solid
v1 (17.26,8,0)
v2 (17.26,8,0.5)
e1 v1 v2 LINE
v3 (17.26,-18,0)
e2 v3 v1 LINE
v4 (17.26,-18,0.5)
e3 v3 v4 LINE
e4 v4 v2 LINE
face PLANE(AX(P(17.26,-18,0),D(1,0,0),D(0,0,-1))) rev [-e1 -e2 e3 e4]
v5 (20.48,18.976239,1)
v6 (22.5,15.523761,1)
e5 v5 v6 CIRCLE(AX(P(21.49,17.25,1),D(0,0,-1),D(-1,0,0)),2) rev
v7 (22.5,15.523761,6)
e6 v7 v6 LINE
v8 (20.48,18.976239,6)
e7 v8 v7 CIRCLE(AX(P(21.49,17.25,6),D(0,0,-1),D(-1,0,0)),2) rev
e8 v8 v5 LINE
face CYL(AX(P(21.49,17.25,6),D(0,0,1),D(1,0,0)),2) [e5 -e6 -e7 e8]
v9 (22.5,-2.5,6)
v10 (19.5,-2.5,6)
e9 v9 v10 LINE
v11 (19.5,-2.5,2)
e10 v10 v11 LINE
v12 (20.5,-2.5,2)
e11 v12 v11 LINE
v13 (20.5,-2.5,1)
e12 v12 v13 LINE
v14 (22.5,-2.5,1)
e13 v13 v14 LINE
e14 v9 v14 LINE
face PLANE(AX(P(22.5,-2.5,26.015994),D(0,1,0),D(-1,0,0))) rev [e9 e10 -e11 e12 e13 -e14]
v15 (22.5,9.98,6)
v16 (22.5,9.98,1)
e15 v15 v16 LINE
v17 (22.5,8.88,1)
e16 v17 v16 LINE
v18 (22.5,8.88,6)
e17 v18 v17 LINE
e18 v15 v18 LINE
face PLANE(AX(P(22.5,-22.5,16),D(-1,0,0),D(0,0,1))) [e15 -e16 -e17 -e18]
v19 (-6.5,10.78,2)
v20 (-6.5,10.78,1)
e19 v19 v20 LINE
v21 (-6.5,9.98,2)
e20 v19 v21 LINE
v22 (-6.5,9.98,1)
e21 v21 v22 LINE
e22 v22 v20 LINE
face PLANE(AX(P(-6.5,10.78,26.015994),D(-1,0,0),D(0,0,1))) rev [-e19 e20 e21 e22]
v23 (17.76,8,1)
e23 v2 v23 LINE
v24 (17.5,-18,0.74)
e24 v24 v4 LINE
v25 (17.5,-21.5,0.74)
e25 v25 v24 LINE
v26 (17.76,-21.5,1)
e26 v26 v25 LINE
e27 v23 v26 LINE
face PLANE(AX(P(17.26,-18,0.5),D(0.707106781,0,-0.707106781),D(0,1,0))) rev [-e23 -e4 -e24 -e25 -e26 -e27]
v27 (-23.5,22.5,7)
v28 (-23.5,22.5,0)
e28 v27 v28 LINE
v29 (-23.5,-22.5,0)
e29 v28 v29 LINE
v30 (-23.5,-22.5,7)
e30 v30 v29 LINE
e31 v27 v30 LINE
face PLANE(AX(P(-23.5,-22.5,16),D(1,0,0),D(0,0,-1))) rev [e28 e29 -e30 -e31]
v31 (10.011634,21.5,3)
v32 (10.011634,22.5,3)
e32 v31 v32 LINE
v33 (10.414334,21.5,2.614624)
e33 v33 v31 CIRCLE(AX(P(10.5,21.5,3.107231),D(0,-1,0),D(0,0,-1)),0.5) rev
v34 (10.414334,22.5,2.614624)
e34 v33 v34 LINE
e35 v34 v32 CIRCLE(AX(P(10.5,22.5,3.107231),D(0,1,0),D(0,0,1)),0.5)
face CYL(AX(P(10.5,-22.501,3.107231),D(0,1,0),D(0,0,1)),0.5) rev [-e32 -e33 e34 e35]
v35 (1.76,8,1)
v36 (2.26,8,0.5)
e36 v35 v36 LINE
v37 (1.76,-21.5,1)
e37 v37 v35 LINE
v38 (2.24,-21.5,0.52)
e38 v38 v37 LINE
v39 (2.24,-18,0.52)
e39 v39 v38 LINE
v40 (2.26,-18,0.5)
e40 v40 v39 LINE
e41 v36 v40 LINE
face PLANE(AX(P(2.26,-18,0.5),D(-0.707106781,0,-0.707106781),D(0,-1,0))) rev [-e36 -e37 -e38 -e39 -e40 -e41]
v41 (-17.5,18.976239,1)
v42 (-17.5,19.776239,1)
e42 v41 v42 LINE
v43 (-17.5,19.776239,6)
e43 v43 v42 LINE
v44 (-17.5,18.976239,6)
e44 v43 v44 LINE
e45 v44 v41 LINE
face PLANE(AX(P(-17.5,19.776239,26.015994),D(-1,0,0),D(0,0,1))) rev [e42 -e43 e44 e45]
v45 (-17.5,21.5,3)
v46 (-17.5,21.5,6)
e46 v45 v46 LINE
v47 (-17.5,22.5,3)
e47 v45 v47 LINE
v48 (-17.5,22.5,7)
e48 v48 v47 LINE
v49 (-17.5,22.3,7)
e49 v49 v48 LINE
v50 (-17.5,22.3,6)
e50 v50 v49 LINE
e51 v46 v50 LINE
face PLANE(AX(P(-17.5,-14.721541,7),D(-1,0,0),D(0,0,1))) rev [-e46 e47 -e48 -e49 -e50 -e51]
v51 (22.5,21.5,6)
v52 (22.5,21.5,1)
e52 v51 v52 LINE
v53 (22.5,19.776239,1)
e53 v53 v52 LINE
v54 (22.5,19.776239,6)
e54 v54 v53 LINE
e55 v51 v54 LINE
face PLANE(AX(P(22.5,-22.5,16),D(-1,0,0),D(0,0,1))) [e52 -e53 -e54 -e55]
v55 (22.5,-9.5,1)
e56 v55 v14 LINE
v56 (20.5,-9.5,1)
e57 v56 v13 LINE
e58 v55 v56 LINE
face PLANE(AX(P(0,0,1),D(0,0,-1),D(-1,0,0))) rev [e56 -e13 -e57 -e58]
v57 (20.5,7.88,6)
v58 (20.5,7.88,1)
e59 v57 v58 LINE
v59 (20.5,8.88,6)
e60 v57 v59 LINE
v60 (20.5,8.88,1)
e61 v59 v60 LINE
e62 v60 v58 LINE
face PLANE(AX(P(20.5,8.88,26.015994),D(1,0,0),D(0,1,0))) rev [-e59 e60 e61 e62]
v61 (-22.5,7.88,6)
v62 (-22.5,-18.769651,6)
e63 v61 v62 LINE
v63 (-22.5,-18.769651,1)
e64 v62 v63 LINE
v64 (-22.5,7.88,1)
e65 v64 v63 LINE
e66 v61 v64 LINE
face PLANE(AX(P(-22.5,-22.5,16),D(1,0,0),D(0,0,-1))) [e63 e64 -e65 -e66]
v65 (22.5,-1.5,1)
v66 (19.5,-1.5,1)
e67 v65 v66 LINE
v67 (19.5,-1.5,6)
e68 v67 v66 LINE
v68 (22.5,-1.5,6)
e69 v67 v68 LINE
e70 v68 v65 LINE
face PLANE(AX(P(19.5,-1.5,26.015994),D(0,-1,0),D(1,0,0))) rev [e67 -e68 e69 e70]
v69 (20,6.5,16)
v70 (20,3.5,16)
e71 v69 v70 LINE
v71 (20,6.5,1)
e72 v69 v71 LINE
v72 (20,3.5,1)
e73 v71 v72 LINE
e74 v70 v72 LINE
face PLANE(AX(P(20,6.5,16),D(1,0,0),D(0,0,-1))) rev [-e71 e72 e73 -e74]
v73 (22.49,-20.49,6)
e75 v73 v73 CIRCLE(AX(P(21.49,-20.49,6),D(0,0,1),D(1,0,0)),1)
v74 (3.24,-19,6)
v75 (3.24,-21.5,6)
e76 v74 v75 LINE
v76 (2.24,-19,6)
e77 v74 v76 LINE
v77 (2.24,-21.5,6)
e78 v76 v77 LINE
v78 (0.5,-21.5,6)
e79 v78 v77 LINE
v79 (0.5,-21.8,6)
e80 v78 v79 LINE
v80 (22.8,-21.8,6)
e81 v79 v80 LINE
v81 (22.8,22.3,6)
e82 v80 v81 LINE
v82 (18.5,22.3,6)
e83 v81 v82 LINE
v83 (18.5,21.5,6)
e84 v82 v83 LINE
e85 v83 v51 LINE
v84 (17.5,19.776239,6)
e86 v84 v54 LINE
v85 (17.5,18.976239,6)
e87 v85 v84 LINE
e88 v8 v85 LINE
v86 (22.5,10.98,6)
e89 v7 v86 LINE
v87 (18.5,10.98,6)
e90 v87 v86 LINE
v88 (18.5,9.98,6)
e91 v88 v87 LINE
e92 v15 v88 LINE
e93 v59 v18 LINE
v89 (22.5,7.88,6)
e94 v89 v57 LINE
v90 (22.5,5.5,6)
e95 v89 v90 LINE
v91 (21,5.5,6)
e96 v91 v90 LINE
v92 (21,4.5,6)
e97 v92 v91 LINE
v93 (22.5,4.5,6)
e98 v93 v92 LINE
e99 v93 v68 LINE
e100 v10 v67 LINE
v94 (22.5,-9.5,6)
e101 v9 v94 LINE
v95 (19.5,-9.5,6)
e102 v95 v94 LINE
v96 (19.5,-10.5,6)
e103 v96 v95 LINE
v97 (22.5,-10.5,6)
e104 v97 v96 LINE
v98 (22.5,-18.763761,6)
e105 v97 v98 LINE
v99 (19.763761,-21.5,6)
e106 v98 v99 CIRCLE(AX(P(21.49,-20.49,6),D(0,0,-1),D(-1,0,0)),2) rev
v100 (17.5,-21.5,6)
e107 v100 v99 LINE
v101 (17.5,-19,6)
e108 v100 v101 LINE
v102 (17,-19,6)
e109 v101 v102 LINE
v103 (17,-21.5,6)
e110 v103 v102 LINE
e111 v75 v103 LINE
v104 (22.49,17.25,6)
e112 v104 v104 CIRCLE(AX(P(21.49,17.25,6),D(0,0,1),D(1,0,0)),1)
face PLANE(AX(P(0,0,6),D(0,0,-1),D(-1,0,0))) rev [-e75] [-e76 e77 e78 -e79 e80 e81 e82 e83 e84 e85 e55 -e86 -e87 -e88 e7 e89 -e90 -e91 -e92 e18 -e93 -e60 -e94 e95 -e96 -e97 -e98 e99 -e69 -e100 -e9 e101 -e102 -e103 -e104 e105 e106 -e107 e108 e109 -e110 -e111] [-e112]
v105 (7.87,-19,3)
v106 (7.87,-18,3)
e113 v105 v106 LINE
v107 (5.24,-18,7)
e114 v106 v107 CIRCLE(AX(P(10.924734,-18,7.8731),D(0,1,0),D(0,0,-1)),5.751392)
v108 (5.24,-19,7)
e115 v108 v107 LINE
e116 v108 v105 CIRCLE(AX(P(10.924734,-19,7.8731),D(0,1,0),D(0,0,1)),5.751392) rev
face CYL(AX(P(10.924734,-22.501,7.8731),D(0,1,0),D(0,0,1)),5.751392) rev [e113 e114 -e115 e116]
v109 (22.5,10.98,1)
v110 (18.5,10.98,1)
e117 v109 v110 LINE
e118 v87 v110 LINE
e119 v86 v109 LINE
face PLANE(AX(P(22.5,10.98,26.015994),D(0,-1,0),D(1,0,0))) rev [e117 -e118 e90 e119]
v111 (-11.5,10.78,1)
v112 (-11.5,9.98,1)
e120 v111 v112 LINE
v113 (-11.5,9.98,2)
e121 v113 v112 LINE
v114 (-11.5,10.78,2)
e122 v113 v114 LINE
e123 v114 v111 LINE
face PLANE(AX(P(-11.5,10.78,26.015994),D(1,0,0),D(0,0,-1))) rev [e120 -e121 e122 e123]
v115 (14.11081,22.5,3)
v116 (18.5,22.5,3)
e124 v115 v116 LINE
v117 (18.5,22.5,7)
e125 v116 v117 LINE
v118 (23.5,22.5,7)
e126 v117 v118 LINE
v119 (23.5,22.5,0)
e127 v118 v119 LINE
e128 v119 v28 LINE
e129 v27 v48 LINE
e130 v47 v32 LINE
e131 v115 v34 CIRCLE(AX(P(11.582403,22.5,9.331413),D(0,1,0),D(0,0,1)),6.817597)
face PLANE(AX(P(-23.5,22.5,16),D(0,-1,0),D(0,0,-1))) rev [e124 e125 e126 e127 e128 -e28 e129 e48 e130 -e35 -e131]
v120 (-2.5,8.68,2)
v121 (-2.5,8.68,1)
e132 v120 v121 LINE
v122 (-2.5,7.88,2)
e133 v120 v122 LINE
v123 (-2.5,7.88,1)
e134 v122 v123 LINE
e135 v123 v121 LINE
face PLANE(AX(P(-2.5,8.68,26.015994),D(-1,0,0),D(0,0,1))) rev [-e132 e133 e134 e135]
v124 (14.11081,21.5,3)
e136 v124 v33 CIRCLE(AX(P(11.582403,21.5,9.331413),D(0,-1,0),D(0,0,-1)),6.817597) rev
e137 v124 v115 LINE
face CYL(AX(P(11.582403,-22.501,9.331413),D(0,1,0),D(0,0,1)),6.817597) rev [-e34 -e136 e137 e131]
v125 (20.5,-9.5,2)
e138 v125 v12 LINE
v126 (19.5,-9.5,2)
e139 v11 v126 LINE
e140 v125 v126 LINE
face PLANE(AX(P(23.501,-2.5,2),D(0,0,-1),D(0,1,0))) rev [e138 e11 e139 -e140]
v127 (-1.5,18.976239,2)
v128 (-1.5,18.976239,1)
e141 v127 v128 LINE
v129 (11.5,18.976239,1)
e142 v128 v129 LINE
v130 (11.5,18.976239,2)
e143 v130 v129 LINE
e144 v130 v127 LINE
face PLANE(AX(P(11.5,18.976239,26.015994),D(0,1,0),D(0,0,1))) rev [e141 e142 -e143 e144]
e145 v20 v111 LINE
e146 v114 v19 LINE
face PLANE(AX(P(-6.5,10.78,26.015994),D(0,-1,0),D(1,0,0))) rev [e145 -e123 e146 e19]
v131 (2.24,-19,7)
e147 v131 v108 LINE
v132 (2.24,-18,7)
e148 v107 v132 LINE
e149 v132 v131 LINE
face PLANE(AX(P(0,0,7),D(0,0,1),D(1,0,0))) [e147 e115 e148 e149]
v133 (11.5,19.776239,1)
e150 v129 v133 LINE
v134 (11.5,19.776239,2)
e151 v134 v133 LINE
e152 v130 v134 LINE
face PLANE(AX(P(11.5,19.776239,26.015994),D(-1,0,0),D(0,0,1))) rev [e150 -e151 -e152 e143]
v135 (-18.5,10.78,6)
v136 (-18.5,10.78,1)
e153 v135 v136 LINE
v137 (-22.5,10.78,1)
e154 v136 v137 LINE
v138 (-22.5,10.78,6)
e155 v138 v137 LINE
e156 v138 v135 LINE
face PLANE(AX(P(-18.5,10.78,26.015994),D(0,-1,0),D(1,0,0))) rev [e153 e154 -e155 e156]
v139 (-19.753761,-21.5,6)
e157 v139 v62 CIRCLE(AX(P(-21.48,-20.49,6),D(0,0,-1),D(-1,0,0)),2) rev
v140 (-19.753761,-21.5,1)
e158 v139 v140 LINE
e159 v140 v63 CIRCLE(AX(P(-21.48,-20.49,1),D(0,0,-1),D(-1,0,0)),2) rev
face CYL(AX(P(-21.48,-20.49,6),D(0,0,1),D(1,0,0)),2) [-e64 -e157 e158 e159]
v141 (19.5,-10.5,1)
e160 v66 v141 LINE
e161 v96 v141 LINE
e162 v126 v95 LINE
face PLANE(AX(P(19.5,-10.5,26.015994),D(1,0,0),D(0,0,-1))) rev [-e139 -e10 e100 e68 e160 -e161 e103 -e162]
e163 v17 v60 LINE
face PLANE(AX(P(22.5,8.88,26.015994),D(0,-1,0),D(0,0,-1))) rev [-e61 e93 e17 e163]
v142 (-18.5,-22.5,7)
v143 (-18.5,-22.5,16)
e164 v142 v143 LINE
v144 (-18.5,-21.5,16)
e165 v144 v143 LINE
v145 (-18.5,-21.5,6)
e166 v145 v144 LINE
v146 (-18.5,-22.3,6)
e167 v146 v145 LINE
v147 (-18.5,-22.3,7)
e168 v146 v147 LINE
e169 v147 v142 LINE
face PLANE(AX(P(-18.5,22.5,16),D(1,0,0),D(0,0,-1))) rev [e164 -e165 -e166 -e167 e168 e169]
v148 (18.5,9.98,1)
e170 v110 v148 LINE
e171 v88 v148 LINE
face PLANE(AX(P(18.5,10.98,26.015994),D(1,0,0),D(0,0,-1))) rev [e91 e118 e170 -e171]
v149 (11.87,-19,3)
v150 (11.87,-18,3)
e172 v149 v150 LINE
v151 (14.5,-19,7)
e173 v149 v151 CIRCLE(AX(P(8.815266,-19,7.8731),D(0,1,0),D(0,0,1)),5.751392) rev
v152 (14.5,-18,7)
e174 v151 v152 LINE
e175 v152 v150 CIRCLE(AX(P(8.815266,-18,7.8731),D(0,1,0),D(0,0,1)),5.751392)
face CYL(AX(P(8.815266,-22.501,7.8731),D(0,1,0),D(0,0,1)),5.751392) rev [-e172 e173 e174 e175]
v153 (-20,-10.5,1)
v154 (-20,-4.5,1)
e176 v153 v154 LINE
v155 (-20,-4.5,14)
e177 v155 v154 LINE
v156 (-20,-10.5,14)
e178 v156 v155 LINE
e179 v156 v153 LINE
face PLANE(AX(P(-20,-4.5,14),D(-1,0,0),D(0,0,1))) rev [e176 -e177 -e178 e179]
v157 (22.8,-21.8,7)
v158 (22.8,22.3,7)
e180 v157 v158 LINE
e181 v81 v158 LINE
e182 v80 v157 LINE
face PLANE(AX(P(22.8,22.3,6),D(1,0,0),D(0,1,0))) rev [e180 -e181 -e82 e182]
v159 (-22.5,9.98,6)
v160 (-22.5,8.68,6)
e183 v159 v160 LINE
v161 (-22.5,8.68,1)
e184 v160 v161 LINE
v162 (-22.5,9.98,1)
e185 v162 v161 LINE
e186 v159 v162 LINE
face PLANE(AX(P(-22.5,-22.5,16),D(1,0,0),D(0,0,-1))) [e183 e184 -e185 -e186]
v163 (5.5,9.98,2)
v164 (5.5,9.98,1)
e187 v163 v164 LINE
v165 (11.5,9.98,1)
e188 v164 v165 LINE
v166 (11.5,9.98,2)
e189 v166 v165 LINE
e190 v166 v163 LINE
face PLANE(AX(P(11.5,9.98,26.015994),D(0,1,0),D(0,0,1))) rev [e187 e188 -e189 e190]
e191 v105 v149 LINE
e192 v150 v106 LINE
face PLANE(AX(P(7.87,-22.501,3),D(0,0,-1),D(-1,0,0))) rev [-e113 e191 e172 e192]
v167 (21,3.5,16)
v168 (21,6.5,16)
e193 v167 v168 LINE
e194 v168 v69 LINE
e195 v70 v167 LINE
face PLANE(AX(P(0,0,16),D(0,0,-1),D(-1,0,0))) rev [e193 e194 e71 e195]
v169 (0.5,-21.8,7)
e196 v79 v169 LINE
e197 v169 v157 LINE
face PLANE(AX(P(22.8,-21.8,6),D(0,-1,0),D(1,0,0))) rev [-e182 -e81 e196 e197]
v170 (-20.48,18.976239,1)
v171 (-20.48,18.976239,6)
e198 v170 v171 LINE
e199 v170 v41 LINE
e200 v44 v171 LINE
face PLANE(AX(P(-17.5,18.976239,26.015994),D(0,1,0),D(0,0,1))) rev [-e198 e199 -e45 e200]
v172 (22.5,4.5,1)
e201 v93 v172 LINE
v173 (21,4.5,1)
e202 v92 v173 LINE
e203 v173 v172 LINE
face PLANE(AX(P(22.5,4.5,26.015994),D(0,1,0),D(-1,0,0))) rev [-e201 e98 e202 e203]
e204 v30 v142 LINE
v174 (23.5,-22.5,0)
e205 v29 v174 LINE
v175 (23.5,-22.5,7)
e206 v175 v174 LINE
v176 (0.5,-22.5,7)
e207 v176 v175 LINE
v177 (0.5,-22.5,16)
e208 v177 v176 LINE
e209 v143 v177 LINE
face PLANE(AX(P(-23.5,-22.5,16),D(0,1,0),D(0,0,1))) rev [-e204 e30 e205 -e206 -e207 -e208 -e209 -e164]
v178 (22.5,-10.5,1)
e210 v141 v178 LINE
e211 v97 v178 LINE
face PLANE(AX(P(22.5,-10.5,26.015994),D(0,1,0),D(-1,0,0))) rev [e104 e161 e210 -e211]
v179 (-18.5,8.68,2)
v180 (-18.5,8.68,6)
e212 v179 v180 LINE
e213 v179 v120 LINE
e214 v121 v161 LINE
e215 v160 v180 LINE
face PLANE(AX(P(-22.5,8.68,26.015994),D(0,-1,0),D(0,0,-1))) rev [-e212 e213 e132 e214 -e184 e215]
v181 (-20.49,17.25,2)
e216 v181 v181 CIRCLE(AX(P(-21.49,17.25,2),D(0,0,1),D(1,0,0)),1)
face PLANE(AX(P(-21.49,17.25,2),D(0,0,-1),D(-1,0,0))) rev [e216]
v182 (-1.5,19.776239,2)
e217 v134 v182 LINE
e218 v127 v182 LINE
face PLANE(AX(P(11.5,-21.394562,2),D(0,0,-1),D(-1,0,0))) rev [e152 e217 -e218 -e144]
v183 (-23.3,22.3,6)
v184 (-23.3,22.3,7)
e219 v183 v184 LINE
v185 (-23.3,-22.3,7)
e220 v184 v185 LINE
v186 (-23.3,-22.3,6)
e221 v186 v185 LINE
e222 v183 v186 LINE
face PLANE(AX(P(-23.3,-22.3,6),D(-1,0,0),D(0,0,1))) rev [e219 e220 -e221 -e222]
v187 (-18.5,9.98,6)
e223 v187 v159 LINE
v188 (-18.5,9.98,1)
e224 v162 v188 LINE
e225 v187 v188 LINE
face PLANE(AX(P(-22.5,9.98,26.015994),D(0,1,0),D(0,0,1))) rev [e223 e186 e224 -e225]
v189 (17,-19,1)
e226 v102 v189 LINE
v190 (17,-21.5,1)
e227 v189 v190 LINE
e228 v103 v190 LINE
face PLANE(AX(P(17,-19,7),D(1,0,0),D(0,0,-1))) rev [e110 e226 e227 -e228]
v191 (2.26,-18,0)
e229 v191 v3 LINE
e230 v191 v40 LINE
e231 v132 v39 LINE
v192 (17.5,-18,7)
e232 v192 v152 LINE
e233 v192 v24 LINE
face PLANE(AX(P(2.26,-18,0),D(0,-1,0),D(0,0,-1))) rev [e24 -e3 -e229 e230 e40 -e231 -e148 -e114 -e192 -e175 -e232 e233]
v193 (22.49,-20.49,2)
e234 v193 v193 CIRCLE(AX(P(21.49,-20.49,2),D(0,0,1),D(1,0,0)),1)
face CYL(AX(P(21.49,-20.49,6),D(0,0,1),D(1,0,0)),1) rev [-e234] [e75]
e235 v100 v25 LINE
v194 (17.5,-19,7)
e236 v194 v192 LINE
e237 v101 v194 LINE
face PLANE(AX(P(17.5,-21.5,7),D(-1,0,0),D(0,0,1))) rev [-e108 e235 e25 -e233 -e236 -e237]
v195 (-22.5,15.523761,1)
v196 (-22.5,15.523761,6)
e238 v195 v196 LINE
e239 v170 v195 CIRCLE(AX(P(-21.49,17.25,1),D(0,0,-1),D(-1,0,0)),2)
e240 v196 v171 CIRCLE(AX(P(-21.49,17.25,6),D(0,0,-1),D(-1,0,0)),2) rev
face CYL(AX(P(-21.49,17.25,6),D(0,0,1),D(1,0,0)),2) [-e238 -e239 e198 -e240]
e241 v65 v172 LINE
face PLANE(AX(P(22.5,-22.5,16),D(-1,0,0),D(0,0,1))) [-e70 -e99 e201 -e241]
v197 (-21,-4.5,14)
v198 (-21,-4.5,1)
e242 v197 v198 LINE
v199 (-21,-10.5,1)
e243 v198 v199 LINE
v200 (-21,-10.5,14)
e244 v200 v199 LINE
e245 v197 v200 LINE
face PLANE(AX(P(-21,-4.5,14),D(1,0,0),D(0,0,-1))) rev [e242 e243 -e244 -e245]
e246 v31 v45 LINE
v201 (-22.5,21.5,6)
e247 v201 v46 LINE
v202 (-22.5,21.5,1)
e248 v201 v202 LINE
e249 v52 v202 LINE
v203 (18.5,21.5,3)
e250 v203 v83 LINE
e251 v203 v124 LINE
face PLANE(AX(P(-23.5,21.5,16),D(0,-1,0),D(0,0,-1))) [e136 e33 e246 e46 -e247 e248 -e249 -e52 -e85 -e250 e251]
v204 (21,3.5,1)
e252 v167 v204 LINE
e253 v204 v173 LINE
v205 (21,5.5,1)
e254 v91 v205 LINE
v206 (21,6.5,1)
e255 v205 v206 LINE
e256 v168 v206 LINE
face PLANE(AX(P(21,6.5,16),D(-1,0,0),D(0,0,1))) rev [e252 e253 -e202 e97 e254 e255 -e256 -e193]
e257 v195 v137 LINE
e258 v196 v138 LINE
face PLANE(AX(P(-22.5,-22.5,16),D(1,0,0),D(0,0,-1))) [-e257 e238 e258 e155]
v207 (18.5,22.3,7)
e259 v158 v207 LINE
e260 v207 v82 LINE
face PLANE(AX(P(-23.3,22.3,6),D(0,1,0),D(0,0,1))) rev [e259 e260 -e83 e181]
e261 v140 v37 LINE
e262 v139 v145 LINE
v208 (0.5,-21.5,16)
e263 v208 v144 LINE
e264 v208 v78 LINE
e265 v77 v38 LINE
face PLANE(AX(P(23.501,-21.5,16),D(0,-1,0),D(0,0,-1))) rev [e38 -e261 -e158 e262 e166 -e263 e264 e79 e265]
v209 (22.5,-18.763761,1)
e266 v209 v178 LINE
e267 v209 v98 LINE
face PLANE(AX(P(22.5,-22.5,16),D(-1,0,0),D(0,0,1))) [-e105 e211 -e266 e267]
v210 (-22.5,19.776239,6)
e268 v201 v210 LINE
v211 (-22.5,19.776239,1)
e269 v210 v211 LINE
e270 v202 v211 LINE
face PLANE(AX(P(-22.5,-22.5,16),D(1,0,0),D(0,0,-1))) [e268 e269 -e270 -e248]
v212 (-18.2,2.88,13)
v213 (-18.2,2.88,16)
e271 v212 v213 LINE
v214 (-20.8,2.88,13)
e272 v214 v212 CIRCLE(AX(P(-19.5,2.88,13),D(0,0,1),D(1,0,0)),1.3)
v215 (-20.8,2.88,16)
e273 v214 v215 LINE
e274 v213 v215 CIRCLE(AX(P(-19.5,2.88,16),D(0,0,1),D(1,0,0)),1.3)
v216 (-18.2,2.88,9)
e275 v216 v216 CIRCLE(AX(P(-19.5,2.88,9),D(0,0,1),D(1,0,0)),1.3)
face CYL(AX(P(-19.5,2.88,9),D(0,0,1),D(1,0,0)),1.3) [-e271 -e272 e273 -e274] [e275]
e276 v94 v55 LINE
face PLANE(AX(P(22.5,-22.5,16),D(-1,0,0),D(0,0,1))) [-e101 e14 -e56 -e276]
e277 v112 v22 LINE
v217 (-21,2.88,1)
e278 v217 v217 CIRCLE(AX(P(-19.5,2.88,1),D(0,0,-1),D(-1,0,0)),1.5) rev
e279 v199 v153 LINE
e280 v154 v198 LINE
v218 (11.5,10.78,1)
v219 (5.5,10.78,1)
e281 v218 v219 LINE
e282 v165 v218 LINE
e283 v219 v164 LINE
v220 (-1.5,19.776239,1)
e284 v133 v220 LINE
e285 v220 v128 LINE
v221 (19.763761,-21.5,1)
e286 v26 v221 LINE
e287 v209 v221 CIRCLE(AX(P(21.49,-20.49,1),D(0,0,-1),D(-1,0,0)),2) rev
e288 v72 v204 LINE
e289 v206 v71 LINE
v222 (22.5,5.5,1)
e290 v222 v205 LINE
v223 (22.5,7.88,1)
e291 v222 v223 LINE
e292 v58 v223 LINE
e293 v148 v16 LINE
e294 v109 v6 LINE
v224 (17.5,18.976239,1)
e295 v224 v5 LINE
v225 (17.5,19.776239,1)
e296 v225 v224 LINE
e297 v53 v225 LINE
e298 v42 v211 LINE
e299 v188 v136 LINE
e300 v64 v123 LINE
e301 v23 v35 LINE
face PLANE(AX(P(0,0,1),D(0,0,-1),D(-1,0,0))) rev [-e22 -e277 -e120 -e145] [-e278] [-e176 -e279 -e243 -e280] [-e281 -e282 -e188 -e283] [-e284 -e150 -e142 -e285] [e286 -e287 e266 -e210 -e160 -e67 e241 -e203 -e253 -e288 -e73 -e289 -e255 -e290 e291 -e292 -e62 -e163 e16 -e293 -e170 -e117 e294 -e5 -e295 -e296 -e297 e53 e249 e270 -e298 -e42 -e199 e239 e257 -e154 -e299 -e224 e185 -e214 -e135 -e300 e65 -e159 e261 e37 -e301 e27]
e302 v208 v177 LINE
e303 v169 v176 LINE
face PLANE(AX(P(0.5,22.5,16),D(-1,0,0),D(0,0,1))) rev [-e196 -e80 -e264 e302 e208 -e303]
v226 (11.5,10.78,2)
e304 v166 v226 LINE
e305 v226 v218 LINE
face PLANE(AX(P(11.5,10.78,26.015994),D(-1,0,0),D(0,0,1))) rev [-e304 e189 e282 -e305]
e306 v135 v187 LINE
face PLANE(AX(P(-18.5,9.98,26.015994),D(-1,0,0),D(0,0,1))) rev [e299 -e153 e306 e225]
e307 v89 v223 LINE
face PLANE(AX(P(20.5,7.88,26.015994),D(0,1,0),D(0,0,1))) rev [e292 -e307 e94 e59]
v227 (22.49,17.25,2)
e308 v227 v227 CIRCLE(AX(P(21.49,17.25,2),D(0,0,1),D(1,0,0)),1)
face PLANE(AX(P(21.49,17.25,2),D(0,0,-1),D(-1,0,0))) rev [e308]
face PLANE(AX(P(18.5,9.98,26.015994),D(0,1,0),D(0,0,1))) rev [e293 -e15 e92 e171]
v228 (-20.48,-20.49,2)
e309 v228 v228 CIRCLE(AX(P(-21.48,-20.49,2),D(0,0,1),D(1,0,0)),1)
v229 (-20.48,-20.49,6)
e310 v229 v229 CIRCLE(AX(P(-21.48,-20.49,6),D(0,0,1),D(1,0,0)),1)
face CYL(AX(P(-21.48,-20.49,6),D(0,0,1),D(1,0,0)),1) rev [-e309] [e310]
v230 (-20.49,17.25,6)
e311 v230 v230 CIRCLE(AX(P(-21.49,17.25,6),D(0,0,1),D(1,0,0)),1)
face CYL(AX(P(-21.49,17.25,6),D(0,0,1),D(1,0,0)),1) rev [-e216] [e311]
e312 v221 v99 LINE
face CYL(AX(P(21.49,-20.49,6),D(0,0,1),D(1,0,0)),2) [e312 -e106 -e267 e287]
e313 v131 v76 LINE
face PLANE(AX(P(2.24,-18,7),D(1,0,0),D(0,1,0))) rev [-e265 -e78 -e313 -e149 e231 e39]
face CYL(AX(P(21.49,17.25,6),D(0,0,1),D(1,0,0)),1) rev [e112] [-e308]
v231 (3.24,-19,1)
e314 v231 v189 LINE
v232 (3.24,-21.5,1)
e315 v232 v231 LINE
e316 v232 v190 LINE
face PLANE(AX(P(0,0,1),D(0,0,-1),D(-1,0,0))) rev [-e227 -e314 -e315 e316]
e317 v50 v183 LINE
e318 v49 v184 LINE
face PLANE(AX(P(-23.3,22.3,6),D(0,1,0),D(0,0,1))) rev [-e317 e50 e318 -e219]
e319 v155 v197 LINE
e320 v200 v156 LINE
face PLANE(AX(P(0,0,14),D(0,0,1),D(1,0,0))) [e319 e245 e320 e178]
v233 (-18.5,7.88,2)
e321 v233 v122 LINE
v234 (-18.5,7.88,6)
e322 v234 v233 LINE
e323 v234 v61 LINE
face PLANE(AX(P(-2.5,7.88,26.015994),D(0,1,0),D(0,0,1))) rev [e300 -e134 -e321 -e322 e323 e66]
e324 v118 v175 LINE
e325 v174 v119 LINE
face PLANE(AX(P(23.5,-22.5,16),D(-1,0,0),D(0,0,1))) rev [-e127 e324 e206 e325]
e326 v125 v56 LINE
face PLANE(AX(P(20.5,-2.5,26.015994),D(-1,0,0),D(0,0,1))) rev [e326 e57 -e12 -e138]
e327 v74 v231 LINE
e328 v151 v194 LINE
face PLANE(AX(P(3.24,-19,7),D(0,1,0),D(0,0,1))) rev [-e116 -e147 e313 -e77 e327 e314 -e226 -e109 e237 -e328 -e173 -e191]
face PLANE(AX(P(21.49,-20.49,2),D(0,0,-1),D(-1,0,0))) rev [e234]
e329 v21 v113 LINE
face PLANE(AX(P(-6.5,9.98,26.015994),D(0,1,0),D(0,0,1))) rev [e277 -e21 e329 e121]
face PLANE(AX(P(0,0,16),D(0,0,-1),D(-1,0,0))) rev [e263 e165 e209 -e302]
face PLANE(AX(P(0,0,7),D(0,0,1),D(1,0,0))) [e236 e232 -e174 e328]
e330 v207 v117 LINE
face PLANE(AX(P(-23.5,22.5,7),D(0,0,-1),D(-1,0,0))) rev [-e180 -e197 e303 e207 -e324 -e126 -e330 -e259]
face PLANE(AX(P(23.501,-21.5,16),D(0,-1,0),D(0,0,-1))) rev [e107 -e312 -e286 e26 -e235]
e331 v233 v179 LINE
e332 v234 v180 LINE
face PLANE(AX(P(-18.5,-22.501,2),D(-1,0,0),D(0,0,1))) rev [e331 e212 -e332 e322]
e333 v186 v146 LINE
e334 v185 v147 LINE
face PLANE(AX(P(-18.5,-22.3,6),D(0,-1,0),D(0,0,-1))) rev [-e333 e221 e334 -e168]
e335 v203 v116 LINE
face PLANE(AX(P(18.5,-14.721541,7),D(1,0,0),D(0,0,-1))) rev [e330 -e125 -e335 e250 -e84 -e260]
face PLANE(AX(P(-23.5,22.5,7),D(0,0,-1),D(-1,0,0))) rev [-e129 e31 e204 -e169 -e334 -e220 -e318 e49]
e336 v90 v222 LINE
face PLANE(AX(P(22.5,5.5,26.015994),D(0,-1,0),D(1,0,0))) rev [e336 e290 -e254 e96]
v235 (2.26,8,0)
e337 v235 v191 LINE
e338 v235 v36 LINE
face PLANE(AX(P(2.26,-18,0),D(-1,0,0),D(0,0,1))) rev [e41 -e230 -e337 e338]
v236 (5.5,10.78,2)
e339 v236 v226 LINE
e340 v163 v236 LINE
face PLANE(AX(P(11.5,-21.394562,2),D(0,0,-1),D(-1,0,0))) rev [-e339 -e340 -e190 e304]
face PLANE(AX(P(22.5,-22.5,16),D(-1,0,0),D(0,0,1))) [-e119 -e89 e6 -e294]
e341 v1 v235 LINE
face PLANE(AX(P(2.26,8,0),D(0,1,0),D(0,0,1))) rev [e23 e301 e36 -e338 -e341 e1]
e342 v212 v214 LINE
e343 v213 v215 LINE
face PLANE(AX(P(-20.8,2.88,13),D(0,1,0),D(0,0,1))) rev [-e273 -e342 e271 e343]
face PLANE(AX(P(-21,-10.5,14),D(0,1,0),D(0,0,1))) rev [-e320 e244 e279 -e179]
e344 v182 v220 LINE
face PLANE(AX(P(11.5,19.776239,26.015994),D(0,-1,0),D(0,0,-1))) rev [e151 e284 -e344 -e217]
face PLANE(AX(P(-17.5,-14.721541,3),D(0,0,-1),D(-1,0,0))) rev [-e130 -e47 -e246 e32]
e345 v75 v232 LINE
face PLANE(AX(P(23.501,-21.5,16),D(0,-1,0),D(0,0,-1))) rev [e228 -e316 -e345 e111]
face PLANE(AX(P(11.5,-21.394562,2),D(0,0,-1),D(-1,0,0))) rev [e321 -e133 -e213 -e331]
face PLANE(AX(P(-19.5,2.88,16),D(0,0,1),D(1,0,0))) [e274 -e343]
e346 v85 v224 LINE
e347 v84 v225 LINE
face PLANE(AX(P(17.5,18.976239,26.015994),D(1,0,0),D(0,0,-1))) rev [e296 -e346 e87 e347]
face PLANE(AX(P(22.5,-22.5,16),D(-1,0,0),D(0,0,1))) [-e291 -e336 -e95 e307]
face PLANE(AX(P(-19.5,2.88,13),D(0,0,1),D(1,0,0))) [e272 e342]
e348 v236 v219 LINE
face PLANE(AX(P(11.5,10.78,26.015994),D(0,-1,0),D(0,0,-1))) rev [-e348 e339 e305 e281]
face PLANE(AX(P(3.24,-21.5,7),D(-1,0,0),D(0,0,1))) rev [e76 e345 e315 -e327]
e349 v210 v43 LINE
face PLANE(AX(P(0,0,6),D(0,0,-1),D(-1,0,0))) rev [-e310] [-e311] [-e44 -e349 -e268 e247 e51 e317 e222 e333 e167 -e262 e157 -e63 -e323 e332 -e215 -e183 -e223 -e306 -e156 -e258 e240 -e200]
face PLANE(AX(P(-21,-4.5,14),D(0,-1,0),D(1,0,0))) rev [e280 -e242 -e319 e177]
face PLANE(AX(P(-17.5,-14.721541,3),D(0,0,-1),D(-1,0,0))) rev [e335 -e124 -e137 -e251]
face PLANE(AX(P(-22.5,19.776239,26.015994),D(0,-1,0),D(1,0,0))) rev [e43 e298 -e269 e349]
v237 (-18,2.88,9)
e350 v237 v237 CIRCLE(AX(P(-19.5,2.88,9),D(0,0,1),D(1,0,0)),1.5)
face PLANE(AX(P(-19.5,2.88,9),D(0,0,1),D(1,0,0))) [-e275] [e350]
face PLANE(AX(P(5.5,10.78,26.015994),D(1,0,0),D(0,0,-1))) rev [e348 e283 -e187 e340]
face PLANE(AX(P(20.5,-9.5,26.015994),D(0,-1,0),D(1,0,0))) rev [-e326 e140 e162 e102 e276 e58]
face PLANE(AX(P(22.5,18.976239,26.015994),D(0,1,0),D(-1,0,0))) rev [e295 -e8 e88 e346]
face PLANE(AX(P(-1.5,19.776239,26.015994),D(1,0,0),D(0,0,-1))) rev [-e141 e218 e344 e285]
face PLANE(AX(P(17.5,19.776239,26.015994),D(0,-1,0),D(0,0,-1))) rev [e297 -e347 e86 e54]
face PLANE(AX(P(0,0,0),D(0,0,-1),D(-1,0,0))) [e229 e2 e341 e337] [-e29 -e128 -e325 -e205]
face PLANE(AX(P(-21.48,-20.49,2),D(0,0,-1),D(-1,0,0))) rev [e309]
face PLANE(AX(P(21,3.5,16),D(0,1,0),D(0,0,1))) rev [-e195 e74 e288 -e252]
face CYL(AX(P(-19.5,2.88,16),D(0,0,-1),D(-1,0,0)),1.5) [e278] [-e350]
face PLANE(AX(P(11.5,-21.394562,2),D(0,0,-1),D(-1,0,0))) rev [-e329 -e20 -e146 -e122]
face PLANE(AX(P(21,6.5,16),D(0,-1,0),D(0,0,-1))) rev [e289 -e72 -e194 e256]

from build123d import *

# Parameters (mm, degrees)
SCHIZZO1_W                           = 47
SCHIZZO1_H                           = 45
ESTRUSIONE_ESTRUSIONE1_DEPTH         = 16
SCHIZZO3_W                           = 5
SCHIZZO3_H                           = 9
SCHIZZO3_W_2                         = 23
TAGLIO_ESTRUSIONE1_DEPTH             = 54.228281956
TAGLIO_ESTRUSIONE2_REACH             = 52.262
SCHIZZO4_W                           = 9
SCHIZZO4_H                           = 44
TAGLIO_ESTRUSIONE3_DEPTH             = 1
FORO_PER_VITE_M3_1_D                 = 2
FORO_PER_VITE_M3_1_DEPTH             = 4
SVUOTA1_START                        = 1
SVUOTA1_DEPTH                        = 5
SCHIZZO11_W                          = 15
SCHIZZO11_H                          = 26
TAGLIO_ESTRUSIONE4_DEPTH             = 36.825968235
TAGLIO_ESTRUSIONE5_REACH             = 55.228
SCHIZZO12_W                          = 36
SCHIZZO12_H                          = 4
TAGLIO_ESTRUSIONE5_DIRECTION_2_DEPTH = 54.228281956
ESTRUSIONE_ESTRUSIONE2_DEPTH         = 6
SCHIZZO14_W                          = 1
SCHIZZO14_H                          = 2.5
TAGLIO_ESTRUSIONE6_DEPTH             = 15.26
TAGLIO_ESTRUSIONE7_REACH             = 51.482
SMUSSO1_SIZE                         = 0.5
SCHIZZO16_W                          = 4
SCHIZZO16_H                          = 1
SCHIZZO16_W_2                        = 2
SCHIZZO16_W_3                        = 20
SCHIZZO16_H_2                        = 0.8
SCHIZZO16_W_4                        = 5
SCHIZZO16_W_5                        = 13
SCHIZZO16_W_6                        = 6
SCHIZZO16_W_7                        = 1.5
ESTRUSIONE_ESTRUSIONE3_DEPTH         = 5
TAGLIO_ESTRUSIONE8_REACH             = 53.1
SCHIZZO17_W                          = 4
SCHIZZO17_H                          = 7
SCHIZZO18_W                          = 29
SCHIZZO18_H                          = 4
TAGLIO_ESTRUSIONE9_DEPTH             = 11.896238686
TAGLIO_ESTRUSIONE10_REACH            = 44.195
SCHIZZO19_W                          = 1
SCHIZZO19_H                          = 4
SCHIZZO20_R                          = 1.5
SCHIZZO20_W                          = 1
SCHIZZO20_H                          = 3
ESTRUSIONE_ESTRUSIONE4_DEPTH         = 15
TAGLIO_ESTRUSIONE11_START            = -7
SCHIZZO21_R                          = 1.5
SCHIZZO21_R_2                        = 1.3
TAGLIO_ESTRUSIONE11_DEPTH            = 7
TAGLIO_ESTRUSIONE12_START            = -3
TAGLIO_ESTRUSIONE12_DEPTH            = 3
SCHIZZO23_W                          = 1
SCHIZZO23_H                          = 6
ESTRUSIONE_ESTRUSIONE5_DEPTH         = 13
TAGLIO_ESTRUSIONE14_REACH            = 55.228


# Read off the part's stored shape, not the designer's step: Svuota1
with BuildPart() as part:
    # Schizzo1 → Estrusione-Estrusione1 (new body)
    with BuildSketch(Plane.XY):
        Rectangle(SCHIZZO1_W, SCHIZZO1_H)
    extrude(amount=ESTRUSIONE_ESTRUSIONE1_DEPTH)

    # Schizzo3 → Taglio-Estrusione1 (cut, through all)
    with BuildSketch(Plane.XZ.offset(22.5)):
        with Locations((-21, 11.5)):
            Rectangle(SCHIZZO3_W, SCHIZZO3_H)
        with Locations((12, 11.5)):
            Rectangle(SCHIZZO3_W_2, SCHIZZO3_H)
    extrude(amount=-TAGLIO_ESTRUSIONE1_DEPTH, mode=Mode.SUBTRACT)

    # Schizzo4 → Taglio-Estrusione2 (cut, up to next)
    with BuildSketch(Plane.ZY.offset(18.5), mode=Mode.PRIVATE) as taglio_estrusione2_sk1:
        with Locations((11.5, 0.5)):
            Rectangle(SCHIZZO4_W, SCHIZZO4_H)
    taglio_estrusione2_tool1 = extrude(taglio_estrusione2_sk1.sketch, amount=-TAGLIO_ESTRUSIONE2_REACH, mode=Mode.PRIVATE) & part.part
    add(taglio_estrusione2_tool1.solids().sort_by_distance((-18.5, 0.5, 11.5))[0], mode=Mode.SUBTRACT)

    # Schizzo5 → Taglio-Estrusione3 (cut)
    with BuildSketch(Plane.XY.offset(7)):
        Polygon((-18.5, -21.5), (-18.5, -22.3), (-23.3, -22.3), (-23.3, 22.3), (22.8, 22.3), (22.8, -21.8), (0.5, -21.8), (0.5, -21.5), align=None)
    extrude(amount=-TAGLIO_ESTRUSIONE3_DEPTH, mode=Mode.SUBTRACT)

    # Foro per Vite M3-1
    with Locations(Plane.XY.offset(6)):
        with Locations((-21.49, 17.25), (-21.48, -20.49), (21.49, -20.49), (21.49, 17.25)):
            Hole(FORO_PER_VITE_M3_1_D / 2, depth=FORO_PER_VITE_M3_1_DEPTH)

    # Svuota1 outline → Svuota1 (cut)
    with BuildSketch(Plane.XY.offset(SVUOTA1_START)):
        with BuildLine():
            ThreePointArc((-22.5, -18.769651198), (-20.069895601, -19.071689179), (-19.753761314, -21.5))
            Line((-19.753761314, -21.5), (19.763761314, -21.5))
            ThreePointArc((19.763761314, -21.5), (20.075786438, -19.075786438), (22.5, -18.763761314))
            Line((22.5, -18.763761314), (22.5, 15.523761314))
            ThreePointArc((22.5, 15.523761314), (19.49, 17.25), (22.5, 18.976238686))
            Line((22.5, 18.976238686), (22.5, 21.5))
            Line((22.5, 21.5), (-22.5, 21.5))
            Line((-22.5, 21.5), (-22.5, 18.976238686))
            ThreePointArc((-22.5, 18.976238686), (-19.49, 17.25), (-22.5, 15.523761314))
            Line((-22.5, 15.523761314), (-22.5, -18.769651198))
        make_face()
    extrude(amount=SVUOTA1_DEPTH, mode=Mode.SUBTRACT)

    # Schizzo11 → Taglio-Estrusione4 (cut, through all)
    with BuildSketch(Plane.XY.offset(1)):
        with Locations((9.76, -5)):
            Rectangle(SCHIZZO11_W, SCHIZZO11_H)
    extrude(amount=-TAGLIO_ESTRUSIONE4_DEPTH, mode=Mode.SUBTRACT)

    # Taglio-Estrusione5: up to this face of the body (flat: up to its plane)
    taglio_estrusione5_end = Plane(part.part.faces().sort_by_distance((0, 21.5, 3.5))[0])
    # Schizzo12 → Taglio-Estrusione5 (cut, up to the picked face)
    with BuildSketch(Plane(origin=(0, 22.5, 0), x_dir=(1, 0, 0), z_dir=(0, 1, 0)), mode=Mode.PRIVATE) as taglio_estrusione5_sk1:
        with Locations((0.5, -5)):
            Rectangle(SCHIZZO12_W, SCHIZZO12_H)
    taglio_estrusione5_tool1 = split(extrude(taglio_estrusione5_sk1.sketch, amount=-TAGLIO_ESTRUSIONE5_REACH, mode=Mode.PRIVATE), bisect_by=taglio_estrusione5_end, keep=Keep.BOTH, mode=Mode.PRIVATE)
    add(taglio_estrusione5_tool1.solids().sort_by(Axis((0.5, 22.5, 5), (0, -1, 0)))[0], mode=Mode.SUBTRACT)

    # Schizzo12 → Taglio-Estrusione5 direction 2 (cut)
    with BuildSketch(Plane(origin=(0, 22.5, 0), x_dir=(1, 0, 0), z_dir=(0, 1, 0))):
        with Locations((0.5, -5)):
            Rectangle(SCHIZZO12_W, SCHIZZO12_H)
    extrude(amount=TAGLIO_ESTRUSIONE5_DIRECTION_2_DEPTH, mode=Mode.SUBTRACT)

    # Schizzo13 → Estrusione-Estrusione2 (add)
    with BuildSketch(Plane.XY.offset(1)):
        Polygon((17.5, -21.5), (17.5, -18), (2.24, -18), (2.24, -21.5), (3.24, -21.5), (3.24, -19), (17, -19), (17, -21.5), align=None)
    extrude(amount=ESTRUSIONE_ESTRUSIONE2_DEPTH)

    # Schizzo14 → Taglio-Estrusione6 (cut)
    with BuildSketch(Plane.ZY.offset(-2.24)):
        with Locations((6.5, -20.25)):
            Rectangle(SCHIZZO14_W, SCHIZZO14_H)
    extrude(amount=-TAGLIO_ESTRUSIONE6_DEPTH, mode=Mode.SUBTRACT)

    # Schizzo15 → Taglio-Estrusione7 (cut, up to next)
    with BuildSketch(Plane(origin=(0, -18, 0), x_dir=(1, 0, 0), z_dir=(0, 1, 0)), mode=Mode.PRIVATE) as taglio_estrusione7_sk1:
        with BuildLine():
            Line((7.87, -3), (11.87, -3))
            ThreePointArc((11.87, -3), (13.620947528, -4.7133645), (14.5, -7))
            Line((14.5, -7), (5.24, -7))
            ThreePointArc((5.24, -7), (6.119052472, -4.7133645), (7.87, -3))
        make_face()
    taglio_estrusione7_tool1 = extrude(taglio_estrusione7_sk1.sketch, amount=-TAGLIO_ESTRUSIONE7_REACH, mode=Mode.PRIVATE) & part.part
    add(taglio_estrusione7_tool1.solids().sort_by_distance((9.87, -18, 5.221754))[0], mode=Mode.SUBTRACT)

    # Smusso1
    smusso1_edges = [part.edges().sort_by_distance(p)[0] for p in [
        (2.26, -5, 1),
        (17.26, -5, 1),
    ]]
    chamfer(smusso1_edges, length=SMUSSO1_SIZE)

    # Schizzo16 → Estrusione-Estrusione3 (add)
    with BuildSketch(Plane.XY.offset(1)):
        Polygon((22.5, -9.5), (22.5, -10.5), (19.5, -10.5), (19.5, -1.5), (22.5, -1.5), (22.5, -2.5), (20.5, -2.5), (20.5, -9.5), align=None)
        with Locations((20.5, 10.48)):
            Rectangle(SCHIZZO16_W, SCHIZZO16_H)
        with Locations((21.5, 8.38)):
            Rectangle(SCHIZZO16_W_2, SCHIZZO16_H)
        with Locations((-12.5, 8.28)):
            Rectangle(SCHIZZO16_W_3, SCHIZZO16_H_2)
        with Locations((-20.5, 10.38)):
            Rectangle(SCHIZZO16_W, SCHIZZO16_H_2)
        with Locations((-20, 19.376238686)):
            Rectangle(SCHIZZO16_W_4, SCHIZZO16_H_2)
        with Locations((20, 19.376238686)):
            Rectangle(SCHIZZO16_W_4, SCHIZZO16_H_2)
        with Locations((5, 19.376238686)):
            Rectangle(SCHIZZO16_W_5, SCHIZZO16_H_2)
        with Locations((8.5, 10.38)):
            Rectangle(SCHIZZO16_W_6, SCHIZZO16_H_2)
        with Locations((-9, 10.38)):
            Rectangle(SCHIZZO16_W_4, SCHIZZO16_H_2)
        with Locations((21.75, 5)):
            Rectangle(SCHIZZO16_W_7, SCHIZZO16_H)
    extrude(amount=ESTRUSIONE_ESTRUSIONE3_DEPTH)

    # Schizzo17 → Taglio-Estrusione8 (cut, up to next)
    with BuildSketch(Plane.ZY.offset(-19.5), mode=Mode.PRIVATE) as taglio_estrusione8_sk1:
        with Locations((4, -6)):
            Rectangle(SCHIZZO17_W, SCHIZZO17_H)
    taglio_estrusione8_tool1 = extrude(taglio_estrusione8_sk1.sketch, amount=-TAGLIO_ESTRUSIONE8_REACH, mode=Mode.PRIVATE) & part.part
    add(taglio_estrusione8_tool1.solids().sort_by_distance((19.5, -6, 4))[0], mode=Mode.SUBTRACT)

    # Schizzo18 → Taglio-Estrusione9 (cut)
    with BuildSketch(Plane(origin=(0, 19.776238686, 0), x_dir=(1, 0, 0), z_dir=(0, 1, 0))):
        with Locations((-3, -4)):
            Rectangle(SCHIZZO18_W, SCHIZZO18_H)
    extrude(amount=-TAGLIO_ESTRUSIONE9_DEPTH, mode=Mode.SUBTRACT)

    # Schizzo19 → Taglio-Estrusione10 (cut, up to next)
    with BuildSketch(Plane(origin=(0, 8.68, 0), x_dir=(1, 0, 0), z_dir=(0, 1, 0)), mode=Mode.PRIVATE) as taglio_estrusione10_sk1:
        with Locations((-18, -4)):
            Rectangle(SCHIZZO19_W, SCHIZZO19_H)
    taglio_estrusione10_tool1 = extrude(taglio_estrusione10_sk1.sketch, amount=-TAGLIO_ESTRUSIONE10_REACH, mode=Mode.PRIVATE) & part.part
    add(taglio_estrusione10_tool1.solids().sort_by_distance((-18, 8.68, 4))[0], mode=Mode.SUBTRACT)

    # Schizzo20 → Estrusione-Estrusione4 (add)
    with BuildSketch(Plane.XY.offset(1)):
        with Locations(Location((-19.5, 2.88, 0), (0, 0, 180))):
            Circle(SCHIZZO20_R)
        with Locations((20.5, 5)):
            Rectangle(SCHIZZO20_W, SCHIZZO20_H)
    extrude(amount=ESTRUSIONE_ESTRUSIONE4_DEPTH)

    # Schizzo21 → Taglio-Estrusione11 (cut)
    with BuildSketch(Plane.XY.offset(16).offset(TAGLIO_ESTRUSIONE11_START)):
        with Locations(Location((-19.5, 2.88, 0), (0, 0, 180))):
            Circle(SCHIZZO21_R)
        with Locations((-19.5, 2.88)):
            Circle(SCHIZZO21_R_2, mode=Mode.SUBTRACT)
    extrude(amount=TAGLIO_ESTRUSIONE11_DEPTH, mode=Mode.SUBTRACT)

    # Schizzo22 → Taglio-Estrusione12 (cut)
    with BuildSketch(Plane.XY.offset(16).offset(TAGLIO_ESTRUSIONE12_START)):
        with BuildLine():
            Line((-20.8, 2.88), (-18.2, 2.88))
            ThreePointArc((-18.2, 2.88), (-19.5, 1.58), (-20.8, 2.88))
        make_face()
    extrude(amount=TAGLIO_ESTRUSIONE12_DEPTH, mode=Mode.SUBTRACT)

    # Schizzo23 → Estrusione-Estrusione5 (add)
    with BuildSketch(Plane.XY.offset(1)):
        with Locations((-20.5, -7.5)):
            Rectangle(SCHIZZO23_W, SCHIZZO23_H)
    extrude(amount=ESTRUSIONE_ESTRUSIONE5_DEPTH)

    # Schizzo25 → Taglio-Estrusione14 (cut, up to next)
    with BuildSketch(Plane(origin=(0, 22.5, 0), x_dir=(1, 0, 0), z_dir=(0, 1, 0)), mode=Mode.PRIVATE) as taglio_estrusione14_sk1:
        with BuildLine():
            Line((14.110810194, -3), (10.011633802, -3))
            ThreePointArc((10.011633802, -3), (10.15430246, -2.745992416), (10.414334326, -2.614624125))
            ThreePointArc((10.414334326, -2.614624125), (12.289339232, -2.550566702), (14.110810194, -3))
        make_face()
    taglio_estrusione14_tool1 = extrude(taglio_estrusione14_sk1.sketch, amount=-TAGLIO_ESTRUSIONE14_REACH, mode=Mode.PRIVATE) & part.part
    add(taglio_estrusione14_tool1.solids().sort_by_distance((11.816989, 22.5, 2.796311))[0], mode=Mode.SUBTRACT)


solid = part.part
